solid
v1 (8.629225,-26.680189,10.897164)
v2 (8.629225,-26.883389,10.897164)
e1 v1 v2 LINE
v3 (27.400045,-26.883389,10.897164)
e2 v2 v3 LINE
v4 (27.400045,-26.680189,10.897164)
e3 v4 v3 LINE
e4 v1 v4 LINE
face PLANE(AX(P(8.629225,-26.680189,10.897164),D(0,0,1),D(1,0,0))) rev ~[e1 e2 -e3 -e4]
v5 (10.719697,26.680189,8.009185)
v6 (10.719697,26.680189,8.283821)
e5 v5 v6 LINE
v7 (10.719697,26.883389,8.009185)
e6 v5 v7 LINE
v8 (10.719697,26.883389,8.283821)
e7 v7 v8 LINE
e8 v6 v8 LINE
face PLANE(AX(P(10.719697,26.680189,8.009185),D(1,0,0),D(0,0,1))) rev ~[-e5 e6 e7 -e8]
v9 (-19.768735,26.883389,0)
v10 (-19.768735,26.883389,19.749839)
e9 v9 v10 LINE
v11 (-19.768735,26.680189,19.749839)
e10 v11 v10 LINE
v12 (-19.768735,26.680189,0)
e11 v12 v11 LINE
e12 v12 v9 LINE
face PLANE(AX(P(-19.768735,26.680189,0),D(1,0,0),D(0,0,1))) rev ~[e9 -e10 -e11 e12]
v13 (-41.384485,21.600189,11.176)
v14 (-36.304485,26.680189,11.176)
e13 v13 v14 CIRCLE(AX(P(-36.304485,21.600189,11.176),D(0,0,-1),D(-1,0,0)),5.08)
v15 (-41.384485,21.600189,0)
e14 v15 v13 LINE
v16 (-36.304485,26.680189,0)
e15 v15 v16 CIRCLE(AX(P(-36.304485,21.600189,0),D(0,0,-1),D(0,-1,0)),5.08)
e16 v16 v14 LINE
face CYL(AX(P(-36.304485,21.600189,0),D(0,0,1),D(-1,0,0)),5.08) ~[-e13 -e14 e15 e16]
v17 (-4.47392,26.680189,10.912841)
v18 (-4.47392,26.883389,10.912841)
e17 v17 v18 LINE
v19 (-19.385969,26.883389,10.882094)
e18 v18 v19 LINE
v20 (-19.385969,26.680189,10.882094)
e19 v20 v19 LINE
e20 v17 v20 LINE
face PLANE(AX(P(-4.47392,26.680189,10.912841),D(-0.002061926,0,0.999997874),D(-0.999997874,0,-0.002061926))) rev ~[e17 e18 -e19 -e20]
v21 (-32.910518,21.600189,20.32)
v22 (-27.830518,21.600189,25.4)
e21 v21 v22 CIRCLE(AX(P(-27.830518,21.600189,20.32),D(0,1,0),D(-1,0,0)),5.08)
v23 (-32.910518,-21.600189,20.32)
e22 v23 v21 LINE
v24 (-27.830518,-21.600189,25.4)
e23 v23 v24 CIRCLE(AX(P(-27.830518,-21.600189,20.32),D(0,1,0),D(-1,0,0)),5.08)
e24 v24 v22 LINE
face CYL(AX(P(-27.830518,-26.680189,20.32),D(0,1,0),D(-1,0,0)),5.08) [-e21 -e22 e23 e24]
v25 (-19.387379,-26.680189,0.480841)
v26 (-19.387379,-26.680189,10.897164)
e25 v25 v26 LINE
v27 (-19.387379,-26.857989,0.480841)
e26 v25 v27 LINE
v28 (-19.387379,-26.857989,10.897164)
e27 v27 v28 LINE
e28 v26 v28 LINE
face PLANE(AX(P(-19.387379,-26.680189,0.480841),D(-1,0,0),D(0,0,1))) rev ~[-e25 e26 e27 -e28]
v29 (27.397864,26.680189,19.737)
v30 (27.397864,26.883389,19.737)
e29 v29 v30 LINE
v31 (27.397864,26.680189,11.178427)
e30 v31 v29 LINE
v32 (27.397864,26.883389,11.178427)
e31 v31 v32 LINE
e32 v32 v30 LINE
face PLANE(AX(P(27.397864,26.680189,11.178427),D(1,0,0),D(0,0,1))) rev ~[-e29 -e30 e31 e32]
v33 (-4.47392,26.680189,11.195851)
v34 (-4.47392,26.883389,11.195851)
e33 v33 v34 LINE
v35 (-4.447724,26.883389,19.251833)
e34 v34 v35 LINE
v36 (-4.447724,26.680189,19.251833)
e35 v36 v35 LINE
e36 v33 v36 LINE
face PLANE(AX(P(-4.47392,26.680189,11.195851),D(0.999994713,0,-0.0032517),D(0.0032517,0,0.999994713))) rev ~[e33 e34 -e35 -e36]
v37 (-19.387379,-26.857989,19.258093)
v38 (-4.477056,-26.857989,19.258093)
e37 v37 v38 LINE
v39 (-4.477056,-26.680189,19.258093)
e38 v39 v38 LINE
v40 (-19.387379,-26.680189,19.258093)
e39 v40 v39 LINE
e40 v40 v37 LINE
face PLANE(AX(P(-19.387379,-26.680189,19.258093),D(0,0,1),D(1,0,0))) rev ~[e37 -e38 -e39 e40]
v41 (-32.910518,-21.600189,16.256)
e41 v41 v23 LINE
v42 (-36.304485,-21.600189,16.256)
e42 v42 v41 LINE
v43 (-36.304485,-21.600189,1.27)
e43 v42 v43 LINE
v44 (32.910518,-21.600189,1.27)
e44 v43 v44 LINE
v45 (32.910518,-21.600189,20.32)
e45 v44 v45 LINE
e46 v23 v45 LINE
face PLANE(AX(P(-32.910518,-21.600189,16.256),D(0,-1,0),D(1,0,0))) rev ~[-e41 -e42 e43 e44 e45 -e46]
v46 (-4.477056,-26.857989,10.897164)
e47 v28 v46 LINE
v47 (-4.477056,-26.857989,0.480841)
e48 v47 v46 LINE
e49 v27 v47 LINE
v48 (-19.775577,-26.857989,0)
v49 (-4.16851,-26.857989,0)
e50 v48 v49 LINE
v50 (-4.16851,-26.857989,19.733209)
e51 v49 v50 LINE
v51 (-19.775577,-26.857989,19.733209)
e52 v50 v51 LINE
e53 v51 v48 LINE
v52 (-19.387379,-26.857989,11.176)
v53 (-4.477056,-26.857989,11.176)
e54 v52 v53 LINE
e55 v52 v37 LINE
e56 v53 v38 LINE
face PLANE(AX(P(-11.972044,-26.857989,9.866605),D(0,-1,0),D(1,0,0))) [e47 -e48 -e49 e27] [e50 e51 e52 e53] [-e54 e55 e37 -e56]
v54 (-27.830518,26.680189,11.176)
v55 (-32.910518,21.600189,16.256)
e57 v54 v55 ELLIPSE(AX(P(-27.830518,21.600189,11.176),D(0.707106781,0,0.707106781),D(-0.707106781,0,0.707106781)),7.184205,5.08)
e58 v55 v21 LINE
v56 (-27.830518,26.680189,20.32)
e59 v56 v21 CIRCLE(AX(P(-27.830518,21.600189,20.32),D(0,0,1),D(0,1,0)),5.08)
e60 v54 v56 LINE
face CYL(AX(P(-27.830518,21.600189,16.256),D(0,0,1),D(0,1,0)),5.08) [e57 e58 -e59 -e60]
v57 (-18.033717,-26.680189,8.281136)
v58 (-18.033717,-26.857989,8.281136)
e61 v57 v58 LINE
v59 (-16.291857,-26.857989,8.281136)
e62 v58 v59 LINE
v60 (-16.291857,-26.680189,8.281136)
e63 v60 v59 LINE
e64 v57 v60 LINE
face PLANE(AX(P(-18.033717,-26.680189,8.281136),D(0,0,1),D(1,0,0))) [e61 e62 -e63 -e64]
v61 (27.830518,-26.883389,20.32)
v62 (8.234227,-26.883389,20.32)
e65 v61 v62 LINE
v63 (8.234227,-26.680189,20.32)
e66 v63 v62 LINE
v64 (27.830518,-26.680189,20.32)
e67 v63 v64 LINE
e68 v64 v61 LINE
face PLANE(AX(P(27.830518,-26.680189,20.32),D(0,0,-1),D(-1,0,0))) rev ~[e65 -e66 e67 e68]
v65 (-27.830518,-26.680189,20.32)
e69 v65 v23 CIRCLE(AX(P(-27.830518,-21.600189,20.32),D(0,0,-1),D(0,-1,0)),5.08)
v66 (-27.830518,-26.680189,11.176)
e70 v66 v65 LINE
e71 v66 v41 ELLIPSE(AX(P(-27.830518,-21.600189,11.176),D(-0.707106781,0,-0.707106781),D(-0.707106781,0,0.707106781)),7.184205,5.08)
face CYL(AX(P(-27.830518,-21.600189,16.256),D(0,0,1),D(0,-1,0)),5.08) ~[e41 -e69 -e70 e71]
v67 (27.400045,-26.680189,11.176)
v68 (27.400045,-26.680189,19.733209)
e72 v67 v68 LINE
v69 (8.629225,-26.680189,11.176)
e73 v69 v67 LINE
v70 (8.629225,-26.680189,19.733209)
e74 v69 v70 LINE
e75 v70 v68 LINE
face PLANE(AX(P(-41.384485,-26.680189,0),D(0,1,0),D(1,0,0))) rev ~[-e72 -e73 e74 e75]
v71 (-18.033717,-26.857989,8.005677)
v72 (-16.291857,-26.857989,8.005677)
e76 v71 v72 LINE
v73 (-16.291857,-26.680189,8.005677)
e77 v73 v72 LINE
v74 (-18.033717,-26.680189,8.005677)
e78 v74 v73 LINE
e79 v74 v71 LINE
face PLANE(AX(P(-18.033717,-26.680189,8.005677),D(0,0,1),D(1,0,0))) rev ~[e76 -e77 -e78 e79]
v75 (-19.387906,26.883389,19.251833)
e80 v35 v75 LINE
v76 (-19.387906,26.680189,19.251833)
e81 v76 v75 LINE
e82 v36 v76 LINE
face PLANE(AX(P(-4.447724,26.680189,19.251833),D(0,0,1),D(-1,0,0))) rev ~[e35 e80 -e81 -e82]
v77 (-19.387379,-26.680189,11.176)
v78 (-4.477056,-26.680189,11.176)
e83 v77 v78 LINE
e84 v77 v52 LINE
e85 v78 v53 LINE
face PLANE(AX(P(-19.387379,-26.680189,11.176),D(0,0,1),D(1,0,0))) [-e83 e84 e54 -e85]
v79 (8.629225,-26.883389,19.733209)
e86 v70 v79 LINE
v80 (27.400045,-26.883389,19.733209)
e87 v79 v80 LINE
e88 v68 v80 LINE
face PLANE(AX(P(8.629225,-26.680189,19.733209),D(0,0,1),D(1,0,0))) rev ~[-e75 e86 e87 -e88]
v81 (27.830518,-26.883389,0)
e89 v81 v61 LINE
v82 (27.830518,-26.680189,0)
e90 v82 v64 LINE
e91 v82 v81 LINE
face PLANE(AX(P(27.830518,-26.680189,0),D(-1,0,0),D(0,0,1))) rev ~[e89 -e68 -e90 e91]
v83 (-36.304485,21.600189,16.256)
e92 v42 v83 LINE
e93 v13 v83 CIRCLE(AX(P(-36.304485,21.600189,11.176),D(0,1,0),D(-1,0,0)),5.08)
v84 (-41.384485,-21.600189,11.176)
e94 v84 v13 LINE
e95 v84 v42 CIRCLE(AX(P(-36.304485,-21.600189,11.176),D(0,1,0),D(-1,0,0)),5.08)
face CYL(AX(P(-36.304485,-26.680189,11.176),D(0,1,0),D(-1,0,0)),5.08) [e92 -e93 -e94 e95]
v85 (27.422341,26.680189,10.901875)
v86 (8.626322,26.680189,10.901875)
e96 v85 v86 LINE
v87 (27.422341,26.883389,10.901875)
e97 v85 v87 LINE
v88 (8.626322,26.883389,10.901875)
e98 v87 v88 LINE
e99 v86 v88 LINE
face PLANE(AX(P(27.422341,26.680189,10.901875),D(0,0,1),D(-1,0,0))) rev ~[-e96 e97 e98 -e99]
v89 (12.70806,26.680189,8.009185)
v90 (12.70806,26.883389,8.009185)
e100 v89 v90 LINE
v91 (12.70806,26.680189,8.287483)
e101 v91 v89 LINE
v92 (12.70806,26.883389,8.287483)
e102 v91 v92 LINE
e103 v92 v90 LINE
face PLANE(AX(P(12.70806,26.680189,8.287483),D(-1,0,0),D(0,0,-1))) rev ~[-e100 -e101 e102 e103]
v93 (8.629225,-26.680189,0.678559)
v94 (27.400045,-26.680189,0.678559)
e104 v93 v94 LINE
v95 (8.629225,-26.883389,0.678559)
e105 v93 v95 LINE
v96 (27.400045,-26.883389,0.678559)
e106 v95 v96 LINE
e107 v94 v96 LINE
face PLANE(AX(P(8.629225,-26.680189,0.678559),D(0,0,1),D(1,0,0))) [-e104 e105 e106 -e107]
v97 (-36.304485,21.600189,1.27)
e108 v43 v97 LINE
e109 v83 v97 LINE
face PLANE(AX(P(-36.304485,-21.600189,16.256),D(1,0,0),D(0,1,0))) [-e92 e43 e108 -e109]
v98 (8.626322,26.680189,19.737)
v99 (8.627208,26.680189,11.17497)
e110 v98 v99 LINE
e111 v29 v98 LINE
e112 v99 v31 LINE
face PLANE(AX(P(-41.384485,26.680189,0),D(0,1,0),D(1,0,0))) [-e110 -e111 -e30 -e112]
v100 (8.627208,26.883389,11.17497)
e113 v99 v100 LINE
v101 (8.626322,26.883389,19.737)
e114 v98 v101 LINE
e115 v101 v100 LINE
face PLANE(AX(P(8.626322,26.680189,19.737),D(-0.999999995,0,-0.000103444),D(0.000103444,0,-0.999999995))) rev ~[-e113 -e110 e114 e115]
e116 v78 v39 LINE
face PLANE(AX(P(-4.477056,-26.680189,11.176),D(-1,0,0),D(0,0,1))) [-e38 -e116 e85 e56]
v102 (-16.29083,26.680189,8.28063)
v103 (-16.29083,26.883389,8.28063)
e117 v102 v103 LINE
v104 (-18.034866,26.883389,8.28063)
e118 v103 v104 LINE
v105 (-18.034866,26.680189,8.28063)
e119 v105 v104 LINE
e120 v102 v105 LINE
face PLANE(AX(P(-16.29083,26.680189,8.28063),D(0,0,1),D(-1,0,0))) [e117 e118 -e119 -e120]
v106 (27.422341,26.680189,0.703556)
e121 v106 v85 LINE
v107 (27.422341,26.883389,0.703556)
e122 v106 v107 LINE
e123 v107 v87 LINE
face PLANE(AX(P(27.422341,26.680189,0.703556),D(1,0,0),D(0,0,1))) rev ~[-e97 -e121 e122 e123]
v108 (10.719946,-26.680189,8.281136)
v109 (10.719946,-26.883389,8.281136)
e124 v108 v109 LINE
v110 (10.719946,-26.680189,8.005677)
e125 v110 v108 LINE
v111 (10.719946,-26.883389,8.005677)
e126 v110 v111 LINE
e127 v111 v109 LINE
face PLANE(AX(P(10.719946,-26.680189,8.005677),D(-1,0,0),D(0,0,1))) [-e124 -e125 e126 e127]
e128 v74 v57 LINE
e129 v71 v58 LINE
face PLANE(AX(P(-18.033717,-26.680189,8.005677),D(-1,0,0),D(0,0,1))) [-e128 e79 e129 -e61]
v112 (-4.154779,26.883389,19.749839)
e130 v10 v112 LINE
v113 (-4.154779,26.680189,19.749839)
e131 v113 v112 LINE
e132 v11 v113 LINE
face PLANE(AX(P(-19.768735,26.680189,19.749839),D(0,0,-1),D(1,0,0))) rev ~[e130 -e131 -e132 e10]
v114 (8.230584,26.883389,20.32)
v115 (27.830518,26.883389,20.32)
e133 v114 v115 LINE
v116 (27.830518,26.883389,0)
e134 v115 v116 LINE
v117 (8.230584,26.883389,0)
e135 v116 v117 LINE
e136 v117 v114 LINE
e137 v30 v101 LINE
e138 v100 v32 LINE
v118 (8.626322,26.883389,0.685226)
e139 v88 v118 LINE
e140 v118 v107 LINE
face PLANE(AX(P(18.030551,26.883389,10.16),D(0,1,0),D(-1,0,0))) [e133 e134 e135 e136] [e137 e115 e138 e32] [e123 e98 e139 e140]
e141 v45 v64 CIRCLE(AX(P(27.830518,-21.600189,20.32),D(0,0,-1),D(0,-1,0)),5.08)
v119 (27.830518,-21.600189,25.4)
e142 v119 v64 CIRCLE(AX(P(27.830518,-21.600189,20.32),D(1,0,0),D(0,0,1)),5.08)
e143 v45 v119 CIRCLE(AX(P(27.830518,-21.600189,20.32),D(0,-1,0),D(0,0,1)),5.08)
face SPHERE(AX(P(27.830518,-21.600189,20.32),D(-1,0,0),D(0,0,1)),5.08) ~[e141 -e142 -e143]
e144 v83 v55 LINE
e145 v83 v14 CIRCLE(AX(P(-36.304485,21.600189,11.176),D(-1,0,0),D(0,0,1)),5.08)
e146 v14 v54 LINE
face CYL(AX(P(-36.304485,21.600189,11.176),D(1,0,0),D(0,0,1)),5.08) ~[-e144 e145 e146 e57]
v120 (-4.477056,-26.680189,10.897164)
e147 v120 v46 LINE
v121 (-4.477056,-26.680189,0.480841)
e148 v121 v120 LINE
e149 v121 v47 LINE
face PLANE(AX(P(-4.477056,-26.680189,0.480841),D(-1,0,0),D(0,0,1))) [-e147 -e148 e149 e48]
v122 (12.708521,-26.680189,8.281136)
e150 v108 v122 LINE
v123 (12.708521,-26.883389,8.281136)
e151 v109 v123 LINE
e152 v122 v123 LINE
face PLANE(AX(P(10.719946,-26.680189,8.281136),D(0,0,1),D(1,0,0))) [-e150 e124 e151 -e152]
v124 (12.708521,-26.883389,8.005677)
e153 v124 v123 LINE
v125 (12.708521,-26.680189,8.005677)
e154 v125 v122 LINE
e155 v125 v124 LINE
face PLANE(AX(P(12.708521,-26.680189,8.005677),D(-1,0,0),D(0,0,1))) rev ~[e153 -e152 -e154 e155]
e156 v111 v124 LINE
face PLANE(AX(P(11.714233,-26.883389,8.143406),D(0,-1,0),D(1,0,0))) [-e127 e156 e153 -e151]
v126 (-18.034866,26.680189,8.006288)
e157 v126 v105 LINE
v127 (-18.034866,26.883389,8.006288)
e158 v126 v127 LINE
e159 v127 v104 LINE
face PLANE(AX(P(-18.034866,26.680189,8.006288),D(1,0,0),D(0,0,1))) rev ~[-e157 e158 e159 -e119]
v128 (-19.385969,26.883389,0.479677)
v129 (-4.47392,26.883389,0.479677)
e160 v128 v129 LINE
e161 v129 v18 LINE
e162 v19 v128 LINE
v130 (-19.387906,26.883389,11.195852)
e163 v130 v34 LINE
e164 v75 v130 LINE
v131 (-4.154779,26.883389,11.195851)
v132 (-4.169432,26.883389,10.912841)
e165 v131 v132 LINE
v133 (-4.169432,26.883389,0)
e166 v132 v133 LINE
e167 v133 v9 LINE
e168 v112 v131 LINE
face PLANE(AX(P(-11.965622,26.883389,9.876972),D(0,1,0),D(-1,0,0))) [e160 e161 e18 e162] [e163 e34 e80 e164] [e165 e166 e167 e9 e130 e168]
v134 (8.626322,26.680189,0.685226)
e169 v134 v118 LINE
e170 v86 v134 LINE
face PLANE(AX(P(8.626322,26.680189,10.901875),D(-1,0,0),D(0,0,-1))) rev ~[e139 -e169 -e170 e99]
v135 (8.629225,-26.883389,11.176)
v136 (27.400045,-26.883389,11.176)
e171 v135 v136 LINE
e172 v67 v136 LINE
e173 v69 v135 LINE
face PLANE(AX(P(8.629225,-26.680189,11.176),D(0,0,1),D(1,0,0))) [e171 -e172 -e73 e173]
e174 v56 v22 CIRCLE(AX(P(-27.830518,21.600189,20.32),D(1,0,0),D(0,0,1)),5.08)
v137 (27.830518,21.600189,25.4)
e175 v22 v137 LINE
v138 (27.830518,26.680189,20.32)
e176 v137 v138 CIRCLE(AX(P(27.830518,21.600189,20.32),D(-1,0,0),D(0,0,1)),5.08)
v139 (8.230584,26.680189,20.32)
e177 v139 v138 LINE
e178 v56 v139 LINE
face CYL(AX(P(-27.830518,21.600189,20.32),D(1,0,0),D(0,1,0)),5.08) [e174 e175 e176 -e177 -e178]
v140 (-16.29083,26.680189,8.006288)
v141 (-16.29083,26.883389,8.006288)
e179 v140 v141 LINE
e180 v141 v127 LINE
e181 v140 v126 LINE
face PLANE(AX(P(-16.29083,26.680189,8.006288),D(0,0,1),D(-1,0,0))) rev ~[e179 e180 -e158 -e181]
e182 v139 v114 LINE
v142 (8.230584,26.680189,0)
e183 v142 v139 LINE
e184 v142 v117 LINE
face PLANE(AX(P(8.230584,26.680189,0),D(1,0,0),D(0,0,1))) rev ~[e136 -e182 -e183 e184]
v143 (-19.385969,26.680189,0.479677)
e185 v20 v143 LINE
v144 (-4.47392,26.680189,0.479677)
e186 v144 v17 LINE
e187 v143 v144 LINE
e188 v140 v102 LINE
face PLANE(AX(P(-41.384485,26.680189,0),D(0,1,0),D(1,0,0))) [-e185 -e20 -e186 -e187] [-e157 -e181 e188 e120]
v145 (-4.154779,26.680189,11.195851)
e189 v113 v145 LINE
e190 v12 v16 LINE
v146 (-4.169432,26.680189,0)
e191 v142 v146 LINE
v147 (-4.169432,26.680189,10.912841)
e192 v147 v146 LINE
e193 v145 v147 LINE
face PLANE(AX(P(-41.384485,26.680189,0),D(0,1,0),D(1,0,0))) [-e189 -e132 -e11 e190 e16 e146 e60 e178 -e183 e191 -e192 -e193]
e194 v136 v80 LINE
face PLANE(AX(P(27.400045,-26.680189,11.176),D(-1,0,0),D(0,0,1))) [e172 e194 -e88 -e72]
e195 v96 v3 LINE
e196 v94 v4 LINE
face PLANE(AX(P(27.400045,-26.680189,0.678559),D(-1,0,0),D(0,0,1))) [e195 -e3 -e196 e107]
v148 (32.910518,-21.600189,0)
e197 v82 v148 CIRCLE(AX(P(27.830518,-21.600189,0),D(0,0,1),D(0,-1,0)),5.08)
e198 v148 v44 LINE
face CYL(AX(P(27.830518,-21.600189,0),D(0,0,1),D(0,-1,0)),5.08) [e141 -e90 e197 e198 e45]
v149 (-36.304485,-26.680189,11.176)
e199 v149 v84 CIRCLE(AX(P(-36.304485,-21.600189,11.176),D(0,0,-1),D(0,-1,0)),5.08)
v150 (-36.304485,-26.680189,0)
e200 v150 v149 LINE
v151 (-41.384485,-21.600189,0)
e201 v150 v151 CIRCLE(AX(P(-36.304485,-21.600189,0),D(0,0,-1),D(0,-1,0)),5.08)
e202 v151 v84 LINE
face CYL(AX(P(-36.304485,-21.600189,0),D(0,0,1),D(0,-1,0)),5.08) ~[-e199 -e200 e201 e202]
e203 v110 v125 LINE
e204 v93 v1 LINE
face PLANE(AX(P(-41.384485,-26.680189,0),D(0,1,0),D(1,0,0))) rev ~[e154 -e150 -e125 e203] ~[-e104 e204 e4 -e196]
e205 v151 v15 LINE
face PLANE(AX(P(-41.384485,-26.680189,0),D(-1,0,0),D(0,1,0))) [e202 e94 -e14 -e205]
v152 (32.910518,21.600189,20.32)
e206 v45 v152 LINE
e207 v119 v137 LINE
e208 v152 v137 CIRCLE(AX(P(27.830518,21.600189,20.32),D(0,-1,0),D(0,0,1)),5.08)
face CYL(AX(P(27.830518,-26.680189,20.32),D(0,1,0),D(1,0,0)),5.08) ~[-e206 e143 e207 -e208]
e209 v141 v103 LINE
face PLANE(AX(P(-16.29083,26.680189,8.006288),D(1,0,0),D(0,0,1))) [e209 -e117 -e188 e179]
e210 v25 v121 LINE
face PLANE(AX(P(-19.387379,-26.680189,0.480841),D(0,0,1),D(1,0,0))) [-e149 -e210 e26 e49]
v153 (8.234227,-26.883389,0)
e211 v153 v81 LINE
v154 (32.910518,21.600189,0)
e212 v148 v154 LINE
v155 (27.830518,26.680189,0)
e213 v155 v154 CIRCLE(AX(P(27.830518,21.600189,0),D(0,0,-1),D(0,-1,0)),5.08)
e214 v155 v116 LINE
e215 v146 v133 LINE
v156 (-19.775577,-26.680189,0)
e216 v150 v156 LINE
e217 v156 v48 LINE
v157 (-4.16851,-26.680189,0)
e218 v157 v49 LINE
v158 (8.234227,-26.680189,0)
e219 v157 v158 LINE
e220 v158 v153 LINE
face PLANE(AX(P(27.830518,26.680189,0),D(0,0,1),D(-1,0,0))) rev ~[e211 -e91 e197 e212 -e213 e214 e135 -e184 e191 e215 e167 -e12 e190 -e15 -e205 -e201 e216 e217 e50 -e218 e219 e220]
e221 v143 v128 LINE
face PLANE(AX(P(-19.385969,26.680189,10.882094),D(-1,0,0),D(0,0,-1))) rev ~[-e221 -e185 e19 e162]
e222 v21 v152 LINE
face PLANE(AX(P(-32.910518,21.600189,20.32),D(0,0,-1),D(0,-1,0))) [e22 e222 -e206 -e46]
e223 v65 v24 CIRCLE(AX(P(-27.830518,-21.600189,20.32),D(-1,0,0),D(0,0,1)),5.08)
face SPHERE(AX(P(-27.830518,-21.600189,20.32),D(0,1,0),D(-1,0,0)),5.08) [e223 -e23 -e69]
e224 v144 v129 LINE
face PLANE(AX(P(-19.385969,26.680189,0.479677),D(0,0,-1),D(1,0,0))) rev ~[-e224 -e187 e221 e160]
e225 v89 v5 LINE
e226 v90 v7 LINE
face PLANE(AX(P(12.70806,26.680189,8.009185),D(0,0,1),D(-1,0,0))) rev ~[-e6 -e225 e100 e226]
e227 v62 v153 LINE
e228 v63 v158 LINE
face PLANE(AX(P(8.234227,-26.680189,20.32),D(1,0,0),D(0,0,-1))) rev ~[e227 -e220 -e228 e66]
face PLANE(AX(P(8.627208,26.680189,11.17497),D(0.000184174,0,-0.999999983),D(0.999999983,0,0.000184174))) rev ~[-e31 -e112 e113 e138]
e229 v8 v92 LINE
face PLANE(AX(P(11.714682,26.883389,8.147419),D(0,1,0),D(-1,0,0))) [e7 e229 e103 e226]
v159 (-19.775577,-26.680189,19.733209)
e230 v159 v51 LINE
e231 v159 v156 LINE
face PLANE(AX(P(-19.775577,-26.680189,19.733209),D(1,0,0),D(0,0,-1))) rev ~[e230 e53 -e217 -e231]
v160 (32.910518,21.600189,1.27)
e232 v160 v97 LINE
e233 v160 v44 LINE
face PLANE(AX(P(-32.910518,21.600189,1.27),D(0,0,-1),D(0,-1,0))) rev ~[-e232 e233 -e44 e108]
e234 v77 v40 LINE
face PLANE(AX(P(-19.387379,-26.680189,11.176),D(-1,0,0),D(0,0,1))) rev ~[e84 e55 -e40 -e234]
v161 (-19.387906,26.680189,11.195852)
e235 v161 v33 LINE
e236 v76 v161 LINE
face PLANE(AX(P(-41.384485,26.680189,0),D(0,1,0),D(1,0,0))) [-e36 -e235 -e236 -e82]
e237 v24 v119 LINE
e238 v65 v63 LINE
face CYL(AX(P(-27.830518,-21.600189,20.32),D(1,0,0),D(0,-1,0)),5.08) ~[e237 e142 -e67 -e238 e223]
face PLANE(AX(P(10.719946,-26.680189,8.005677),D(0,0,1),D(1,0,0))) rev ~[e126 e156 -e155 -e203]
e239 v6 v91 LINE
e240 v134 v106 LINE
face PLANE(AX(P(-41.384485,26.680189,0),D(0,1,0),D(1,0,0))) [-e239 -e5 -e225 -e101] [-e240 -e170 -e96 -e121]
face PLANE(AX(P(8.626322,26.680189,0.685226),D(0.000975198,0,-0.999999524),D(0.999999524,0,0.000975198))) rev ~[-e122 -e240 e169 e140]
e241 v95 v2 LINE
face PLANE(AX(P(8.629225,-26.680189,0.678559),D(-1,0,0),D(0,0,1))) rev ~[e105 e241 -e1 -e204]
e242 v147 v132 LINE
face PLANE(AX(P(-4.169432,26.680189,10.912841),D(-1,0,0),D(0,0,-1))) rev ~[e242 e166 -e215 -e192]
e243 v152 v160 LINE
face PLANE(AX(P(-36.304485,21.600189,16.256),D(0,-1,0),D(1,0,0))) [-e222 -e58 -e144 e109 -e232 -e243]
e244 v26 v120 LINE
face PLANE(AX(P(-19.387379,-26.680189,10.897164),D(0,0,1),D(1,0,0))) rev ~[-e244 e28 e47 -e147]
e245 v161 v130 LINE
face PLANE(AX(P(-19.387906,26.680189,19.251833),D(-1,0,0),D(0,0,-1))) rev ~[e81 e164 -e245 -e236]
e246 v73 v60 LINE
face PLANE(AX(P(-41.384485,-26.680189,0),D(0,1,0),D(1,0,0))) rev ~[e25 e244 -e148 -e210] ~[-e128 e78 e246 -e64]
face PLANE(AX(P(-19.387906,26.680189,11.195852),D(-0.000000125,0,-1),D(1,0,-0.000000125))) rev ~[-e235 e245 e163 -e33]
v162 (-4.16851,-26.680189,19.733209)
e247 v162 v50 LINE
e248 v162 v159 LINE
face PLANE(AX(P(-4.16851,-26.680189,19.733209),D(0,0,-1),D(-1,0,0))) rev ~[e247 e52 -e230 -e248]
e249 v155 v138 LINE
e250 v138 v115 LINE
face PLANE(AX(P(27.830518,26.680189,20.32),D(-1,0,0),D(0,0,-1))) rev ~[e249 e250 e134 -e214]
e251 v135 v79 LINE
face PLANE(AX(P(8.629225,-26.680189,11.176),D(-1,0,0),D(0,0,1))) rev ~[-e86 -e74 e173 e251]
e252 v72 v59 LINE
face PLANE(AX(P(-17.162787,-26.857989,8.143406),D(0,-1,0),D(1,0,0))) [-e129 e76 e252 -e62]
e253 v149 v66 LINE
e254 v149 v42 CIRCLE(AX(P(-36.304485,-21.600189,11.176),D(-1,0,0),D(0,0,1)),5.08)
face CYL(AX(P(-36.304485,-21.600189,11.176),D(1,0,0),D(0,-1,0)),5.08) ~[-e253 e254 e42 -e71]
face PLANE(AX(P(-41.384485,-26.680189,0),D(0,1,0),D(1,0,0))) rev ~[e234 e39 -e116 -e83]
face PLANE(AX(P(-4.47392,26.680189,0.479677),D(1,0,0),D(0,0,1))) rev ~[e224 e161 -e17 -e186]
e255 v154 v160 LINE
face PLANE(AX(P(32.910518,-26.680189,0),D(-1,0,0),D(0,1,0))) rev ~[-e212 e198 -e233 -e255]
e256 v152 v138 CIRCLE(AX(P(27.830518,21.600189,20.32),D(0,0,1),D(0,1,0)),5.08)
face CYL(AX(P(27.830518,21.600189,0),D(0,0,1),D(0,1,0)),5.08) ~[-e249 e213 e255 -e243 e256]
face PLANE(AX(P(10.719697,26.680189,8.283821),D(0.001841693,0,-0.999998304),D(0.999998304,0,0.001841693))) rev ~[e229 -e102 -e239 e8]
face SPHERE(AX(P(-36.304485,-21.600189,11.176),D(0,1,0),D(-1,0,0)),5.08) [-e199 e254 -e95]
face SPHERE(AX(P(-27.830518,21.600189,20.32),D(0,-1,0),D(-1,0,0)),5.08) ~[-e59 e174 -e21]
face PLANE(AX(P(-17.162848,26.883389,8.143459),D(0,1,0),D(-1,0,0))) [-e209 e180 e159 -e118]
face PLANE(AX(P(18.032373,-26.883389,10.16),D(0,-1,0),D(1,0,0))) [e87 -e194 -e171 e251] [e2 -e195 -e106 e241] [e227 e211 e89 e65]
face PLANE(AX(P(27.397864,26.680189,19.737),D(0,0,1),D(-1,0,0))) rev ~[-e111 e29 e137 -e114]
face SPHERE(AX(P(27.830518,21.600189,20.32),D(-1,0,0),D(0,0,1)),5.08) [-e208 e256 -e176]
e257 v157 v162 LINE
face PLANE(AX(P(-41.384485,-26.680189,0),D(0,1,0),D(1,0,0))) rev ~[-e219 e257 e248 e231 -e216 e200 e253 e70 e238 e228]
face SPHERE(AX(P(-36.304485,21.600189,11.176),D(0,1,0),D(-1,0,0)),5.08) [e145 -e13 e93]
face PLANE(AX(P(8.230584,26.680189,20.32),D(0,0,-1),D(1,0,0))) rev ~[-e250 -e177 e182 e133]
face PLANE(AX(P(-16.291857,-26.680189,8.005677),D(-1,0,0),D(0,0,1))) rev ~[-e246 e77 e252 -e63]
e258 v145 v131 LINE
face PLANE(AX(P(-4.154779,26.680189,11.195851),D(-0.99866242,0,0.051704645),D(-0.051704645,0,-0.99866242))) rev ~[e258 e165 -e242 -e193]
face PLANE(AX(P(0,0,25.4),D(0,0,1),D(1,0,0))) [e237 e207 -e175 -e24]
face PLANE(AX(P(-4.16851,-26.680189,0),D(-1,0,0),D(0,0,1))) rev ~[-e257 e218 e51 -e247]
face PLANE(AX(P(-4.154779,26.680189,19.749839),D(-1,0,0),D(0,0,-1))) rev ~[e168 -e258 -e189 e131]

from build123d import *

# Parameters (mm, degrees)
F0_W      = 65.8210366964
F0_H      = 53.360377121
F1_DEPTH  = 25.4
F0_W_2    = 8.4739662707
F2_DEPTH  = 16.256
F3_R      = 5.08
F4_R      = 5.08
F6_W      = 14.9103230797
F6_H      = 10.4163230571
F6_H_2    = 8.0820930889
F6_W_2    = 1.7418600619
F6_H_3    = 0.2754591405
F8_DEPTH  = 0.1778
F6_W_3    = 18.7708195299
F6_H_4    = 10.2186049917
F6_H_5    = 8.557209163
F6_W_4    = 1.9885748625
F9_DEPTH  = 0.2032
F10_W     = 1.7440356314
F10_H     = 0.2743424848
F11_DEPTH = 0.2032
F7_W      = 43.200377121
F7_H      = 4.064
F12_DEPTH = 66.04
F13_DEPTH = 14.986


# Not quite as in the source:
# - two fillets or chamfers of one size are made in one step


with BuildPart() as f1:
    # F0 (on Top) → F1 (new body)
    with BuildSketch(Plane.XY):
        Rectangle(F0_W, F0_H)
    extrude(amount=F1_DEPTH)

    # F0 (on Top) → F2 (join)
    with BuildSketch(Plane.XY):
        with Locations((-37.1475014836, 0)):
            Rectangle(F0_W_2, F0_H)
    extrude(amount=F2_DEPTH)

    # F3
    f3_edges = [f1.edges().sort_by_distance(p)[0] for p in [
        (-32.910518, 0, 25.4),
        (-41.384485, 0, 16.256),
    ]]
    fillet(f3_edges, radius=F3_R)

    # F4
    f4_edges = [f1.edges().sort_by_distance(p)[0] for p in [
        (2.54, -26.680189, 25.4),
        (2.54, 26.680189, 25.4),
        (32.910518, 0, 25.4),
        (-39.896587, -26.680189, 14.768102),
        (-39.896587, 26.680189, 14.768102),
        (-32.910518, -26.680189, 18.288),
        (-32.910518, 26.680189, 18.288),
        (-31.422621, -26.680189, 23.912102),
        (-34.607501, -26.680189, 16.256),
        (32.910518, -26.680189, 12.7),
        (-41.384485, -26.680189, 5.588),
        (-31.422621, 26.680189, 23.912102),
        (-34.607501, 26.680189, 16.256),
        (32.910518, 26.680189, 12.7),
        (-41.384485, 26.680189, 5.588),
    ]]
    fillet(f4_edges, radius=F4_R)

    # F6 (on face) → F8 (join)
    with BuildSketch(Plane.XZ.offset(26.6801885605)):
        Polygon((-19.7755768895, 0), (-4.168510437, 0), (-4.168510437, 11.176), (-4.168510437, 19.733209163), (-19.7755768895, 19.733209163), (-19.7755768895, 11.176), align=None)
        with Locations((-11.9322177488, 5.6890027045)):
            Rectangle(F6_W, F6_H, mode=Mode.SUBTRACT)
        with Locations((-11.9322177488, 15.2170465444)):
            Rectangle(F6_W, F6_H_2, mode=Mode.SUBTRACT)
        with Locations((-17.1627867967, 8.1434063613)):
            Rectangle(F6_W_2, F6_H_3)
    extrude(amount=F8_DEPTH)

    # F6 (on face) → F9 (join)
    with BuildSketch(Plane.XZ.offset(26.6801885605)):
        Polygon((8.2342270762, 20.32), (8.2342270762, 11.176), (8.2342270762, 0), (27.8305183482, 0), (27.8305183482, 11.176), (27.8305183482, 19.733209163), (27.8305183482, 20.32), align=None)
        with Locations((18.0146349594, 5.7878617372)):
            Rectangle(F6_W_3, F6_H_4, mode=Mode.SUBTRACT)
        with Locations((18.0146349594, 15.4546045815)):
            Rectangle(F6_W_3, F6_H_5, mode=Mode.SUBTRACT)
        with Locations((11.7142330855, 8.1434063613)):
            Rectangle(F6_W_4, F6_H_3)
    extrude(amount=F9_DEPTH)

    # F10 (on face) → F11 (join)
    with BuildSketch(Plane(origin=(0, 26.6801885605, 0), x_dir=(-1, 0, 0), z_dir=(0, 1, 0))):
        Polygon((-27.8305183482, 0), (-8.2305837423, 0), (-8.2305837423, 10.9018748626), (-8.2305837423, 20.32), (-27.8305183482, 20.32), (-27.8305183482, 11.2858796492), (-27.8305183482, 10.9018748626), align=None)
        Polygon((-8.626322262, 0.6852262607), (-27.4223405868, 0.7035561139), (-27.4223405868, 10.9018748626), (-8.626322262, 10.9018748626), align=None, mode=Mode.SUBTRACT)
        Polygon((-27.3978635669, 11.1784273759), (-27.3978635669, 19.7369996458), (-8.626322262, 19.7369996458), (-8.6272079498, 11.1749703065), align=None, mode=Mode.SUBTRACT)
        Polygon((-10.7196969911, 8.2838209346), (-12.7080604434, 8.287482895), (-12.7080604434, 8.0091850832), (-10.7196969911, 8.0091850832), align=None)
        Polygon((4.1694319807, 10.9128411859), (4.1694319807, 0), (19.7687353939, 0), (19.7687353939, 10.9128411859), (19.7687353939, 11.1958524212), (19.7687353939, 19.7498388588), (4.1547794826, 19.7498388588), (4.1547794826, 11.1958505586), align=None)
        Polygon((4.4739199802, 0.4796771973), (4.4739199802, 10.9128411859), (19.3859692663, 10.8820935711), (19.3859692663, 0.4796771973), align=None, mode=Mode.SUBTRACT)
        Polygon((19.3879064173, 19.2518327385), (19.3879064173, 11.1958524212), (4.4739199802, 11.1958505586), (4.4477242045, 19.2518327385), align=None, mode=Mode.SUBTRACT)
        with Locations((17.162848264, 8.1434589811)):
            Rectangle(F10_W, F10_H)
    extrude(amount=F11_DEPTH)

    # F7 (on face) → F12 (cut)
    with BuildSketch(Plane(origin=(-32.9105183482, 0, 0), x_dir=(0, -1, 0), z_dir=(-1, 0, 0))):
        with Locations((0, 18.288)):
            Rectangle(F7_W, F7_H)
    extrude(amount=-F12_DEPTH, mode=Mode.SUBTRACT)

    # F13 (cut): a face of the model
    f13_faces = [f1.faces().sort_by_distance(p)[0] for p in [
        (-1.6969831353, 0, 16.256),
    ]]
    extrude(f13_faces, amount=-F13_DEPTH, mode=Mode.SUBTRACT)


solid = f1.part
